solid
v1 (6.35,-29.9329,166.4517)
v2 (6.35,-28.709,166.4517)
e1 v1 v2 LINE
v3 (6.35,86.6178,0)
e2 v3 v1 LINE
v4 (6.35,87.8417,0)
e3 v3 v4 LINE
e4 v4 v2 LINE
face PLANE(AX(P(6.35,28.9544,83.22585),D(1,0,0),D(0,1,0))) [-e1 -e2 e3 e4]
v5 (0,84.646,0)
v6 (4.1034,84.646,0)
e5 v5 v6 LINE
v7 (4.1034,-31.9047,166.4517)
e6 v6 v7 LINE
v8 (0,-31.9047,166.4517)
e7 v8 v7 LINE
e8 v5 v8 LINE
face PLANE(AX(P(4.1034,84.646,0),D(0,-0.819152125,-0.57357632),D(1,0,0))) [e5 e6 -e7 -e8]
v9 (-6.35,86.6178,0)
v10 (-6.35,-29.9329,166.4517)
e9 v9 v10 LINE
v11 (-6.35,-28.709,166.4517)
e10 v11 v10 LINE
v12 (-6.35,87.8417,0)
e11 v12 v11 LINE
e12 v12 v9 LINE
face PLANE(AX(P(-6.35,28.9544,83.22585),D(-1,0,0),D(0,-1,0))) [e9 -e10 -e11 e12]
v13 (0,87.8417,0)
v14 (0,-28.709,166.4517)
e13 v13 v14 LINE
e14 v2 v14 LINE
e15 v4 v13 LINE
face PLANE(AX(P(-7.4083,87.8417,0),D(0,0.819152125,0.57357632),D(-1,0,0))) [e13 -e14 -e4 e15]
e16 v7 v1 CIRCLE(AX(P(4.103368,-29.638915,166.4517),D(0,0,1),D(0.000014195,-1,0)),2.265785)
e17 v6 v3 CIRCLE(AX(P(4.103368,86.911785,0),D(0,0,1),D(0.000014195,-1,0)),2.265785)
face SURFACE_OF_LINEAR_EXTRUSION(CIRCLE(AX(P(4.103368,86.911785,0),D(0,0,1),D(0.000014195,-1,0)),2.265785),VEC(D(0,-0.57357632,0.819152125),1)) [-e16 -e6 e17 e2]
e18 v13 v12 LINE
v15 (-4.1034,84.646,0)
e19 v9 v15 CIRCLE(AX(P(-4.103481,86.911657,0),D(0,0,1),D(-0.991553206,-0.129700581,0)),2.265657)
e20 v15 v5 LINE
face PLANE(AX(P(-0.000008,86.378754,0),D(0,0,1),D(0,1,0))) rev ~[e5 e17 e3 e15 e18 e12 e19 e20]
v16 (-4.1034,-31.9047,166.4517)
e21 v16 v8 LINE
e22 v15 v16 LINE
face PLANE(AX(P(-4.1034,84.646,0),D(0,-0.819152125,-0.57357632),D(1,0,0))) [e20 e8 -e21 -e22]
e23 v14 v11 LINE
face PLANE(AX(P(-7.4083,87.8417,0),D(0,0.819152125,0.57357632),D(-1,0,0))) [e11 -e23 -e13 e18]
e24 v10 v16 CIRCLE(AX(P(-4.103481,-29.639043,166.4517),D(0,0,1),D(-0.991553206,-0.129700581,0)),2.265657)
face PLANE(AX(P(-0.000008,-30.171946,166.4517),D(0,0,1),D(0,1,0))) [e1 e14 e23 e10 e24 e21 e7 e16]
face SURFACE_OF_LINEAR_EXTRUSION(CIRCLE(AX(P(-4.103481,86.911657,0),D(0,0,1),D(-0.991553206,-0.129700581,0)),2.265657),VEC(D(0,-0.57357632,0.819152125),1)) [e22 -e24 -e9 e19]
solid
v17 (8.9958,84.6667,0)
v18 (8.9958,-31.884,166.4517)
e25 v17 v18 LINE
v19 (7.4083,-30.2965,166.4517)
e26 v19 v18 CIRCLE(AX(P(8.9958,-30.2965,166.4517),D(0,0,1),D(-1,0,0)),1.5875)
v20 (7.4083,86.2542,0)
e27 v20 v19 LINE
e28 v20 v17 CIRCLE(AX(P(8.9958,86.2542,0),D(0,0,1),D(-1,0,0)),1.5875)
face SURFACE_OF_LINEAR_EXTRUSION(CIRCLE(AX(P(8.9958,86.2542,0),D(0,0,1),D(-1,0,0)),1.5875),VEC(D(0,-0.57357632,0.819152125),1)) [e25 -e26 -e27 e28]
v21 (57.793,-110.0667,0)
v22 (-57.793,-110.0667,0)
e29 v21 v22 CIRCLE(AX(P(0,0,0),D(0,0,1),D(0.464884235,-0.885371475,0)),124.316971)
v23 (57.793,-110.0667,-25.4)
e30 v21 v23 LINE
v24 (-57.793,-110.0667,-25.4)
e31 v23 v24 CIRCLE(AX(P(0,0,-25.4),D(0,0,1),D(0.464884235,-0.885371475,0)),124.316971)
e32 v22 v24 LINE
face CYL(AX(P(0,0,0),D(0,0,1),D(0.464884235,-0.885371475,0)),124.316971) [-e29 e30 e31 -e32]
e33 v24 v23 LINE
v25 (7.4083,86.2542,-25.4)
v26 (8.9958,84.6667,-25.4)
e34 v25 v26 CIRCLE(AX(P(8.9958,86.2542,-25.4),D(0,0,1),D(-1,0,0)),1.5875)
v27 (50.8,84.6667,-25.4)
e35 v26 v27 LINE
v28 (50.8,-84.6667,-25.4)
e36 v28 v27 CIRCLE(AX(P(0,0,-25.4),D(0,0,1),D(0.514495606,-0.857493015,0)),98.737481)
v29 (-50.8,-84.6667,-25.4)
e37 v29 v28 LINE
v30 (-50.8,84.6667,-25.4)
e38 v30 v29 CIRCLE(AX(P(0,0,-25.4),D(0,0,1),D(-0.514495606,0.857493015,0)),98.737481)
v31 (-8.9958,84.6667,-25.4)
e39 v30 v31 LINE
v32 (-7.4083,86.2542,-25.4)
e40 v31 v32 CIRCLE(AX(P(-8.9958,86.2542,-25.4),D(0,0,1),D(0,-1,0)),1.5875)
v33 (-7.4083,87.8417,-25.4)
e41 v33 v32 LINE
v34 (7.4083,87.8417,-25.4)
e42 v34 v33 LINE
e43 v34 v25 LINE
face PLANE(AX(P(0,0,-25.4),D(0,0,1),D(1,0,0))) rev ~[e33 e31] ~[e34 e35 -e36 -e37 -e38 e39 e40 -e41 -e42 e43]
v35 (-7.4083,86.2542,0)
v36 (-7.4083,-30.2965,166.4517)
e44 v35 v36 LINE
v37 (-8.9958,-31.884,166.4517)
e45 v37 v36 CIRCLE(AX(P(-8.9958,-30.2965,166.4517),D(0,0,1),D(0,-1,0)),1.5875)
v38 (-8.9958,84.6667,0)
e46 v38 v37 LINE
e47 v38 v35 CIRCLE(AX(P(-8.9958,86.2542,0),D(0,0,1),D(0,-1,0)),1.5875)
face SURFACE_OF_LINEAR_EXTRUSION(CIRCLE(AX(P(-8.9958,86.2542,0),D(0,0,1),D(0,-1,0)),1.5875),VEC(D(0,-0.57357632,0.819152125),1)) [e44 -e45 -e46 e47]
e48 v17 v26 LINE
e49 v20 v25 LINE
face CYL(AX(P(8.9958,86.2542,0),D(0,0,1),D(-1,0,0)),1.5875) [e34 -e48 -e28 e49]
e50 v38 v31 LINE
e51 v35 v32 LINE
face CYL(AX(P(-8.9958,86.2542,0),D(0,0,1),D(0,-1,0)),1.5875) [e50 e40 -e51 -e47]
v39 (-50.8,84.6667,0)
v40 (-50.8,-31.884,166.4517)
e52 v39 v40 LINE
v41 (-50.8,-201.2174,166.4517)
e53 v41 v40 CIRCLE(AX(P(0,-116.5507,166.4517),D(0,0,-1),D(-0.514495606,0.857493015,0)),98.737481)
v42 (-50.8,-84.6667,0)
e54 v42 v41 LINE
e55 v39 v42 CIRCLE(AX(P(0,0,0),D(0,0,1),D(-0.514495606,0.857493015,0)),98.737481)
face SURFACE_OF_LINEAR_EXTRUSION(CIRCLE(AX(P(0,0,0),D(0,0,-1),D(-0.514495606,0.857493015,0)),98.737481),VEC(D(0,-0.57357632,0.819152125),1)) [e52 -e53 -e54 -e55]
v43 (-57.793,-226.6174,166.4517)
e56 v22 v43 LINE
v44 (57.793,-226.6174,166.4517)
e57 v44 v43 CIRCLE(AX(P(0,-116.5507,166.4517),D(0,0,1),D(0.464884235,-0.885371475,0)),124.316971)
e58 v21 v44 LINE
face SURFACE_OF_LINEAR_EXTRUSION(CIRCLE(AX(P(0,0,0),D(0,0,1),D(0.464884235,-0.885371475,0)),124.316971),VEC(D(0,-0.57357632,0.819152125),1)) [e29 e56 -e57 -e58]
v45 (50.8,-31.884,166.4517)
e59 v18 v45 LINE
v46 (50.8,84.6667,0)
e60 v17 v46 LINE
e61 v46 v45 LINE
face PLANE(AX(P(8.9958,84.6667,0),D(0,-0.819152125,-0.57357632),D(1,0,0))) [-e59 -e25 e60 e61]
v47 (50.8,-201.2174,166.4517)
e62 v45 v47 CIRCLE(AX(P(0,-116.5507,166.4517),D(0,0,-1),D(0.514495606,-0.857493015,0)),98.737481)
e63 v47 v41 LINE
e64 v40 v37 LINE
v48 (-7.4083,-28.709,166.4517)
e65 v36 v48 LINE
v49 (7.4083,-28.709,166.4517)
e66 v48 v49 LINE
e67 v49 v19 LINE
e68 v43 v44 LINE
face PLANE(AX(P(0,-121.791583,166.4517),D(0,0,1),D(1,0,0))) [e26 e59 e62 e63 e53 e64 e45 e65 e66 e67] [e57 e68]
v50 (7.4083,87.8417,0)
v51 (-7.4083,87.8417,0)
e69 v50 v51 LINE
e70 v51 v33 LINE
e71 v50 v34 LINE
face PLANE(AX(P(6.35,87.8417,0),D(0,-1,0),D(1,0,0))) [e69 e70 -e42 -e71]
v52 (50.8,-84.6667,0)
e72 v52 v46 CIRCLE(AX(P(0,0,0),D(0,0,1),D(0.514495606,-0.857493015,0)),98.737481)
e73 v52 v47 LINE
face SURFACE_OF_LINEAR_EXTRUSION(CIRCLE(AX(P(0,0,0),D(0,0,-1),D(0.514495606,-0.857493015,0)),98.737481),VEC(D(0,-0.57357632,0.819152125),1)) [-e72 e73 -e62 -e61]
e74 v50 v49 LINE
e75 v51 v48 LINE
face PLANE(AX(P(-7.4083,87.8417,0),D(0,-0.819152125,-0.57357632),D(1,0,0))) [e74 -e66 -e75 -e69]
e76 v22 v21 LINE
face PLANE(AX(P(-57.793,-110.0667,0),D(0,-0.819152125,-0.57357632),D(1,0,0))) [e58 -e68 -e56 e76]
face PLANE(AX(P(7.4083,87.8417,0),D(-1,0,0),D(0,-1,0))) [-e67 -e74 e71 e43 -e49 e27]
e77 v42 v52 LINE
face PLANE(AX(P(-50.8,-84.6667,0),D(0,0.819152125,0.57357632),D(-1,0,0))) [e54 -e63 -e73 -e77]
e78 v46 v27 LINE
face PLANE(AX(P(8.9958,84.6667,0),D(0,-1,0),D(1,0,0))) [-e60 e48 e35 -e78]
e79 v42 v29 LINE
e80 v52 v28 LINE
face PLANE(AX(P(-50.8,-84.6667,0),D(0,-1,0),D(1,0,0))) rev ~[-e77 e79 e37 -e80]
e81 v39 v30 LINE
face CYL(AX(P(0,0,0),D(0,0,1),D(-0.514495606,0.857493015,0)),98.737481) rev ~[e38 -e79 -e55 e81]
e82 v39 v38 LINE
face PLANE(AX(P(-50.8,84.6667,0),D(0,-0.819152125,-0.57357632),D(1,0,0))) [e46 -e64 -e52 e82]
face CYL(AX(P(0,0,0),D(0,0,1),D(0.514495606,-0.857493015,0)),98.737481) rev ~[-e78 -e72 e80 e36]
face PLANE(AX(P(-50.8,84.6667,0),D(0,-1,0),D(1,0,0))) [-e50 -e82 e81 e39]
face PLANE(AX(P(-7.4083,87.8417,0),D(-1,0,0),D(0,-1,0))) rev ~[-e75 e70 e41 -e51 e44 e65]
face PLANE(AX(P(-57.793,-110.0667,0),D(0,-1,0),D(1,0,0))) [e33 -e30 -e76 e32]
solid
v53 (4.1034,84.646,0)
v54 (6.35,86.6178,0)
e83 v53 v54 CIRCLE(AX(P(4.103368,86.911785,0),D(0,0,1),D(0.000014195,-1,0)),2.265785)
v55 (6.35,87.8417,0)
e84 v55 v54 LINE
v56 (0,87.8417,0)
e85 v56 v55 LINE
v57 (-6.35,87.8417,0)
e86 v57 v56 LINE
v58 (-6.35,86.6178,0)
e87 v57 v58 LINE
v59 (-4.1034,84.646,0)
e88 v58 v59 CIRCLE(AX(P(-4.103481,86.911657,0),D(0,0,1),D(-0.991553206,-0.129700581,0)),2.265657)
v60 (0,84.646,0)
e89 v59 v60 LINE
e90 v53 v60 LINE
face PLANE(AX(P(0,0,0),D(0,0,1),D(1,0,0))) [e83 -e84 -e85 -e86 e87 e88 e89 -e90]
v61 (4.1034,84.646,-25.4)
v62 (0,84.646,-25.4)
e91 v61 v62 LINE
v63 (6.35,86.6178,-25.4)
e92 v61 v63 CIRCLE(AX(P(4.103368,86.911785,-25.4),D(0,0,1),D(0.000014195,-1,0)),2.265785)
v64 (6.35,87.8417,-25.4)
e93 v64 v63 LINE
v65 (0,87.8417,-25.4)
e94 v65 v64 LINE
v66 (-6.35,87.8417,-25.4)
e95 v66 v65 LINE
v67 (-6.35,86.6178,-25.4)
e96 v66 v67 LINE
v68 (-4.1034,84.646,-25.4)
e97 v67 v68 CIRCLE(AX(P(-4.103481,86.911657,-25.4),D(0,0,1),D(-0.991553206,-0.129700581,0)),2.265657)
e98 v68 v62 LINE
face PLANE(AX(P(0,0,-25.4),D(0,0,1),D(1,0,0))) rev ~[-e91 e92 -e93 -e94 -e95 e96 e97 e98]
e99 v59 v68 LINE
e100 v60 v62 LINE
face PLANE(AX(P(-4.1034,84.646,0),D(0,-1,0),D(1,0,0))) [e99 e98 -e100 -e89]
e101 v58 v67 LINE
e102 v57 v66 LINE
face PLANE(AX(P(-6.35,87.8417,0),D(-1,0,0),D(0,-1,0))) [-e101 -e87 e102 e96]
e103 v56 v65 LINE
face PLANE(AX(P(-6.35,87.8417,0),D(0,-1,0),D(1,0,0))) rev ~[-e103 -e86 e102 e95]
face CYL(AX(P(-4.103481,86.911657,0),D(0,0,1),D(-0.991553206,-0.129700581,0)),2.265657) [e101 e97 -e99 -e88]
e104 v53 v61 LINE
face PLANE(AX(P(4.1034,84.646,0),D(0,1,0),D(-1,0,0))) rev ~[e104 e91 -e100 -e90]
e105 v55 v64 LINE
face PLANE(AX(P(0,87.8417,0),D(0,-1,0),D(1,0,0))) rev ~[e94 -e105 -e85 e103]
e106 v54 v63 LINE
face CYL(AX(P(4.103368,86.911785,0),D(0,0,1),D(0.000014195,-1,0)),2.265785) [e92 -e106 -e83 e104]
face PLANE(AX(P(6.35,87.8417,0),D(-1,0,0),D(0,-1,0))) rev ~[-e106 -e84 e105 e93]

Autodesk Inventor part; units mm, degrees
ref_plane "YZ Plane" through (0, 0, 0) normal (1, 0, 0) x (0, 1, 0)
ref_plane "XZ Plane" through (0, 0, 0) normal (0, 1, 0) x (-1, 0, 0)
sketch "Sketch1" plane through (0, 0, 0) normal (0, 0, 1) x (1, 0, 0)
  line L0 (-50.8, -84.6667) -> (50.8, -84.6667)
  arc A0 (57.793, -110.0667) -> (-57.793, -110.0667) centre (0, 0) ccw
  arc A1 (-50.8, 84.6667) -> (-50.8, -84.6667) centre (0, 0) ccw
  arc A2 (50.8, -84.6667) -> (50.8, 84.6667) centre (0, 0) ccw
  line L1 (-57.793, -110.0667) -> (57.793, -110.0667)
  line L2 (0, 84.6667) -> (0, 87.8417) construction
  line L3 (-7.4083, 87.8417) -> (7.4083, 87.8417)
  line L4 (-7.4083, 87.8417) -> (-7.4083, 86.2542)
  line L5 (7.4083, 87.8417) -> (7.4083, 86.2542)
  line L6 (0, 84.6667) -> (8.9958, 84.6667) construction
  arc A3 (7.4083, 86.2542) -> (8.9958, 84.6667) centre (8.9958, 86.2542) ccw
  arc A4 (-8.9958, 84.6667) -> (-7.4083, 86.2542) centre (-8.9958, 86.2542) ccw
  line L7 (-50.8, 84.6667) -> (-8.9958, 84.6667)
  line L8 (8.9958, 84.6667) -> (50.8, 84.6667)
  line L9 (0, 84.6667) -> (-8.9958, 84.6667) construction
  line L10 (-6.35, 87.8417) -> (0, 87.8417)
  line L11 (7.4083, 87.8417) -> (-7.4083, 87.8417)
  line L12 (-6.35, 87.8417) -> (-6.35, 86.6178)
  line L13 (-4.1034, 84.646) -> (0, 84.646)
  line L14 (0, 84.646) -> (0, 87.8417) construction
  line L15 (-6.3485, 84.6667) -> (-3.1743, 87.8409) construction
  arc A5 (-3.1736, 84.646) -> (-6.35, 87.8417) centre (-6.3485, 84.6667) ccw construction
  arc A6 (-6.35, 86.6178) -> (-4.1034, 84.646) centre (-4.1034, 86.9117) ccw
  line L16 (6.35, 87.8417) -> (0, 87.8417)
  line L17 (6.35, 87.8417) -> (6.35, 86.6178)
  line L18 (4.1034, 84.646) -> (0, 84.646)
  line L19 (6.3485, 84.6667) -> (3.1743, 87.8409) construction
  arc A7 (6.35, 87.8417) -> (3.1736, 84.646) centre (6.3485, 84.6667) ccw construction
  arc A8 (4.1034, 84.646) -> (6.35, 86.6178) centre (4.1034, 86.9117) ccw
  line L20 (6.35, 87.8417) -> (-6.35, 87.8417)
  dimension "d1" = 101.6
  dimension "d2" = 25.4
  dimension "d34" = 14.8167
  dimension "d35" = 1.5875
  dimension "d36" = 1.5875
  dimension "d38" = 6.35
  dimension "d39" = 3.175
  dimension "d40" = 45
  dimension "d41" = 2.2657
  dimension "d42" = 2.2466
extrude "connecction top" add sketch "Sketch1" against normal blind 25.4
extrude "light flat" add sketch "Sketch1" against normal up to surface (25.4 mm away) separate body contours L3 L17 A8 L18 L13 A6 L12
ref_plane "Work Plane2" through (0, 0, 203.2) normal (0, 0, 1) x (1, 0, 0)
sketch "Sketch6" plane through (0, 0, 0) normal (1, 0, 0) x (0, 1, 0)
  line L0 (-110.0667, 0) -> (124.3169, 0) projected
  line L1 (-83.4784, 0) -> (-200.0291, 166.4517)
  point P0 (0, 0)
  dimension "d28" = 203.2
  dimension "d29" = 55
sweep "ramp" add profiles "Sketch1" path "Sketch6" bodies 1 path curves L1
sweep "light angle" add profiles "Sketch1" path "Sketch6" separate body path curves L1 contours L3 L17 A8 L18 L13 A6 L12
equation "\"d35\" = 0.5 * d37"
equation "\"d37\" = 3.175"
properties part number "ramp top connect"
